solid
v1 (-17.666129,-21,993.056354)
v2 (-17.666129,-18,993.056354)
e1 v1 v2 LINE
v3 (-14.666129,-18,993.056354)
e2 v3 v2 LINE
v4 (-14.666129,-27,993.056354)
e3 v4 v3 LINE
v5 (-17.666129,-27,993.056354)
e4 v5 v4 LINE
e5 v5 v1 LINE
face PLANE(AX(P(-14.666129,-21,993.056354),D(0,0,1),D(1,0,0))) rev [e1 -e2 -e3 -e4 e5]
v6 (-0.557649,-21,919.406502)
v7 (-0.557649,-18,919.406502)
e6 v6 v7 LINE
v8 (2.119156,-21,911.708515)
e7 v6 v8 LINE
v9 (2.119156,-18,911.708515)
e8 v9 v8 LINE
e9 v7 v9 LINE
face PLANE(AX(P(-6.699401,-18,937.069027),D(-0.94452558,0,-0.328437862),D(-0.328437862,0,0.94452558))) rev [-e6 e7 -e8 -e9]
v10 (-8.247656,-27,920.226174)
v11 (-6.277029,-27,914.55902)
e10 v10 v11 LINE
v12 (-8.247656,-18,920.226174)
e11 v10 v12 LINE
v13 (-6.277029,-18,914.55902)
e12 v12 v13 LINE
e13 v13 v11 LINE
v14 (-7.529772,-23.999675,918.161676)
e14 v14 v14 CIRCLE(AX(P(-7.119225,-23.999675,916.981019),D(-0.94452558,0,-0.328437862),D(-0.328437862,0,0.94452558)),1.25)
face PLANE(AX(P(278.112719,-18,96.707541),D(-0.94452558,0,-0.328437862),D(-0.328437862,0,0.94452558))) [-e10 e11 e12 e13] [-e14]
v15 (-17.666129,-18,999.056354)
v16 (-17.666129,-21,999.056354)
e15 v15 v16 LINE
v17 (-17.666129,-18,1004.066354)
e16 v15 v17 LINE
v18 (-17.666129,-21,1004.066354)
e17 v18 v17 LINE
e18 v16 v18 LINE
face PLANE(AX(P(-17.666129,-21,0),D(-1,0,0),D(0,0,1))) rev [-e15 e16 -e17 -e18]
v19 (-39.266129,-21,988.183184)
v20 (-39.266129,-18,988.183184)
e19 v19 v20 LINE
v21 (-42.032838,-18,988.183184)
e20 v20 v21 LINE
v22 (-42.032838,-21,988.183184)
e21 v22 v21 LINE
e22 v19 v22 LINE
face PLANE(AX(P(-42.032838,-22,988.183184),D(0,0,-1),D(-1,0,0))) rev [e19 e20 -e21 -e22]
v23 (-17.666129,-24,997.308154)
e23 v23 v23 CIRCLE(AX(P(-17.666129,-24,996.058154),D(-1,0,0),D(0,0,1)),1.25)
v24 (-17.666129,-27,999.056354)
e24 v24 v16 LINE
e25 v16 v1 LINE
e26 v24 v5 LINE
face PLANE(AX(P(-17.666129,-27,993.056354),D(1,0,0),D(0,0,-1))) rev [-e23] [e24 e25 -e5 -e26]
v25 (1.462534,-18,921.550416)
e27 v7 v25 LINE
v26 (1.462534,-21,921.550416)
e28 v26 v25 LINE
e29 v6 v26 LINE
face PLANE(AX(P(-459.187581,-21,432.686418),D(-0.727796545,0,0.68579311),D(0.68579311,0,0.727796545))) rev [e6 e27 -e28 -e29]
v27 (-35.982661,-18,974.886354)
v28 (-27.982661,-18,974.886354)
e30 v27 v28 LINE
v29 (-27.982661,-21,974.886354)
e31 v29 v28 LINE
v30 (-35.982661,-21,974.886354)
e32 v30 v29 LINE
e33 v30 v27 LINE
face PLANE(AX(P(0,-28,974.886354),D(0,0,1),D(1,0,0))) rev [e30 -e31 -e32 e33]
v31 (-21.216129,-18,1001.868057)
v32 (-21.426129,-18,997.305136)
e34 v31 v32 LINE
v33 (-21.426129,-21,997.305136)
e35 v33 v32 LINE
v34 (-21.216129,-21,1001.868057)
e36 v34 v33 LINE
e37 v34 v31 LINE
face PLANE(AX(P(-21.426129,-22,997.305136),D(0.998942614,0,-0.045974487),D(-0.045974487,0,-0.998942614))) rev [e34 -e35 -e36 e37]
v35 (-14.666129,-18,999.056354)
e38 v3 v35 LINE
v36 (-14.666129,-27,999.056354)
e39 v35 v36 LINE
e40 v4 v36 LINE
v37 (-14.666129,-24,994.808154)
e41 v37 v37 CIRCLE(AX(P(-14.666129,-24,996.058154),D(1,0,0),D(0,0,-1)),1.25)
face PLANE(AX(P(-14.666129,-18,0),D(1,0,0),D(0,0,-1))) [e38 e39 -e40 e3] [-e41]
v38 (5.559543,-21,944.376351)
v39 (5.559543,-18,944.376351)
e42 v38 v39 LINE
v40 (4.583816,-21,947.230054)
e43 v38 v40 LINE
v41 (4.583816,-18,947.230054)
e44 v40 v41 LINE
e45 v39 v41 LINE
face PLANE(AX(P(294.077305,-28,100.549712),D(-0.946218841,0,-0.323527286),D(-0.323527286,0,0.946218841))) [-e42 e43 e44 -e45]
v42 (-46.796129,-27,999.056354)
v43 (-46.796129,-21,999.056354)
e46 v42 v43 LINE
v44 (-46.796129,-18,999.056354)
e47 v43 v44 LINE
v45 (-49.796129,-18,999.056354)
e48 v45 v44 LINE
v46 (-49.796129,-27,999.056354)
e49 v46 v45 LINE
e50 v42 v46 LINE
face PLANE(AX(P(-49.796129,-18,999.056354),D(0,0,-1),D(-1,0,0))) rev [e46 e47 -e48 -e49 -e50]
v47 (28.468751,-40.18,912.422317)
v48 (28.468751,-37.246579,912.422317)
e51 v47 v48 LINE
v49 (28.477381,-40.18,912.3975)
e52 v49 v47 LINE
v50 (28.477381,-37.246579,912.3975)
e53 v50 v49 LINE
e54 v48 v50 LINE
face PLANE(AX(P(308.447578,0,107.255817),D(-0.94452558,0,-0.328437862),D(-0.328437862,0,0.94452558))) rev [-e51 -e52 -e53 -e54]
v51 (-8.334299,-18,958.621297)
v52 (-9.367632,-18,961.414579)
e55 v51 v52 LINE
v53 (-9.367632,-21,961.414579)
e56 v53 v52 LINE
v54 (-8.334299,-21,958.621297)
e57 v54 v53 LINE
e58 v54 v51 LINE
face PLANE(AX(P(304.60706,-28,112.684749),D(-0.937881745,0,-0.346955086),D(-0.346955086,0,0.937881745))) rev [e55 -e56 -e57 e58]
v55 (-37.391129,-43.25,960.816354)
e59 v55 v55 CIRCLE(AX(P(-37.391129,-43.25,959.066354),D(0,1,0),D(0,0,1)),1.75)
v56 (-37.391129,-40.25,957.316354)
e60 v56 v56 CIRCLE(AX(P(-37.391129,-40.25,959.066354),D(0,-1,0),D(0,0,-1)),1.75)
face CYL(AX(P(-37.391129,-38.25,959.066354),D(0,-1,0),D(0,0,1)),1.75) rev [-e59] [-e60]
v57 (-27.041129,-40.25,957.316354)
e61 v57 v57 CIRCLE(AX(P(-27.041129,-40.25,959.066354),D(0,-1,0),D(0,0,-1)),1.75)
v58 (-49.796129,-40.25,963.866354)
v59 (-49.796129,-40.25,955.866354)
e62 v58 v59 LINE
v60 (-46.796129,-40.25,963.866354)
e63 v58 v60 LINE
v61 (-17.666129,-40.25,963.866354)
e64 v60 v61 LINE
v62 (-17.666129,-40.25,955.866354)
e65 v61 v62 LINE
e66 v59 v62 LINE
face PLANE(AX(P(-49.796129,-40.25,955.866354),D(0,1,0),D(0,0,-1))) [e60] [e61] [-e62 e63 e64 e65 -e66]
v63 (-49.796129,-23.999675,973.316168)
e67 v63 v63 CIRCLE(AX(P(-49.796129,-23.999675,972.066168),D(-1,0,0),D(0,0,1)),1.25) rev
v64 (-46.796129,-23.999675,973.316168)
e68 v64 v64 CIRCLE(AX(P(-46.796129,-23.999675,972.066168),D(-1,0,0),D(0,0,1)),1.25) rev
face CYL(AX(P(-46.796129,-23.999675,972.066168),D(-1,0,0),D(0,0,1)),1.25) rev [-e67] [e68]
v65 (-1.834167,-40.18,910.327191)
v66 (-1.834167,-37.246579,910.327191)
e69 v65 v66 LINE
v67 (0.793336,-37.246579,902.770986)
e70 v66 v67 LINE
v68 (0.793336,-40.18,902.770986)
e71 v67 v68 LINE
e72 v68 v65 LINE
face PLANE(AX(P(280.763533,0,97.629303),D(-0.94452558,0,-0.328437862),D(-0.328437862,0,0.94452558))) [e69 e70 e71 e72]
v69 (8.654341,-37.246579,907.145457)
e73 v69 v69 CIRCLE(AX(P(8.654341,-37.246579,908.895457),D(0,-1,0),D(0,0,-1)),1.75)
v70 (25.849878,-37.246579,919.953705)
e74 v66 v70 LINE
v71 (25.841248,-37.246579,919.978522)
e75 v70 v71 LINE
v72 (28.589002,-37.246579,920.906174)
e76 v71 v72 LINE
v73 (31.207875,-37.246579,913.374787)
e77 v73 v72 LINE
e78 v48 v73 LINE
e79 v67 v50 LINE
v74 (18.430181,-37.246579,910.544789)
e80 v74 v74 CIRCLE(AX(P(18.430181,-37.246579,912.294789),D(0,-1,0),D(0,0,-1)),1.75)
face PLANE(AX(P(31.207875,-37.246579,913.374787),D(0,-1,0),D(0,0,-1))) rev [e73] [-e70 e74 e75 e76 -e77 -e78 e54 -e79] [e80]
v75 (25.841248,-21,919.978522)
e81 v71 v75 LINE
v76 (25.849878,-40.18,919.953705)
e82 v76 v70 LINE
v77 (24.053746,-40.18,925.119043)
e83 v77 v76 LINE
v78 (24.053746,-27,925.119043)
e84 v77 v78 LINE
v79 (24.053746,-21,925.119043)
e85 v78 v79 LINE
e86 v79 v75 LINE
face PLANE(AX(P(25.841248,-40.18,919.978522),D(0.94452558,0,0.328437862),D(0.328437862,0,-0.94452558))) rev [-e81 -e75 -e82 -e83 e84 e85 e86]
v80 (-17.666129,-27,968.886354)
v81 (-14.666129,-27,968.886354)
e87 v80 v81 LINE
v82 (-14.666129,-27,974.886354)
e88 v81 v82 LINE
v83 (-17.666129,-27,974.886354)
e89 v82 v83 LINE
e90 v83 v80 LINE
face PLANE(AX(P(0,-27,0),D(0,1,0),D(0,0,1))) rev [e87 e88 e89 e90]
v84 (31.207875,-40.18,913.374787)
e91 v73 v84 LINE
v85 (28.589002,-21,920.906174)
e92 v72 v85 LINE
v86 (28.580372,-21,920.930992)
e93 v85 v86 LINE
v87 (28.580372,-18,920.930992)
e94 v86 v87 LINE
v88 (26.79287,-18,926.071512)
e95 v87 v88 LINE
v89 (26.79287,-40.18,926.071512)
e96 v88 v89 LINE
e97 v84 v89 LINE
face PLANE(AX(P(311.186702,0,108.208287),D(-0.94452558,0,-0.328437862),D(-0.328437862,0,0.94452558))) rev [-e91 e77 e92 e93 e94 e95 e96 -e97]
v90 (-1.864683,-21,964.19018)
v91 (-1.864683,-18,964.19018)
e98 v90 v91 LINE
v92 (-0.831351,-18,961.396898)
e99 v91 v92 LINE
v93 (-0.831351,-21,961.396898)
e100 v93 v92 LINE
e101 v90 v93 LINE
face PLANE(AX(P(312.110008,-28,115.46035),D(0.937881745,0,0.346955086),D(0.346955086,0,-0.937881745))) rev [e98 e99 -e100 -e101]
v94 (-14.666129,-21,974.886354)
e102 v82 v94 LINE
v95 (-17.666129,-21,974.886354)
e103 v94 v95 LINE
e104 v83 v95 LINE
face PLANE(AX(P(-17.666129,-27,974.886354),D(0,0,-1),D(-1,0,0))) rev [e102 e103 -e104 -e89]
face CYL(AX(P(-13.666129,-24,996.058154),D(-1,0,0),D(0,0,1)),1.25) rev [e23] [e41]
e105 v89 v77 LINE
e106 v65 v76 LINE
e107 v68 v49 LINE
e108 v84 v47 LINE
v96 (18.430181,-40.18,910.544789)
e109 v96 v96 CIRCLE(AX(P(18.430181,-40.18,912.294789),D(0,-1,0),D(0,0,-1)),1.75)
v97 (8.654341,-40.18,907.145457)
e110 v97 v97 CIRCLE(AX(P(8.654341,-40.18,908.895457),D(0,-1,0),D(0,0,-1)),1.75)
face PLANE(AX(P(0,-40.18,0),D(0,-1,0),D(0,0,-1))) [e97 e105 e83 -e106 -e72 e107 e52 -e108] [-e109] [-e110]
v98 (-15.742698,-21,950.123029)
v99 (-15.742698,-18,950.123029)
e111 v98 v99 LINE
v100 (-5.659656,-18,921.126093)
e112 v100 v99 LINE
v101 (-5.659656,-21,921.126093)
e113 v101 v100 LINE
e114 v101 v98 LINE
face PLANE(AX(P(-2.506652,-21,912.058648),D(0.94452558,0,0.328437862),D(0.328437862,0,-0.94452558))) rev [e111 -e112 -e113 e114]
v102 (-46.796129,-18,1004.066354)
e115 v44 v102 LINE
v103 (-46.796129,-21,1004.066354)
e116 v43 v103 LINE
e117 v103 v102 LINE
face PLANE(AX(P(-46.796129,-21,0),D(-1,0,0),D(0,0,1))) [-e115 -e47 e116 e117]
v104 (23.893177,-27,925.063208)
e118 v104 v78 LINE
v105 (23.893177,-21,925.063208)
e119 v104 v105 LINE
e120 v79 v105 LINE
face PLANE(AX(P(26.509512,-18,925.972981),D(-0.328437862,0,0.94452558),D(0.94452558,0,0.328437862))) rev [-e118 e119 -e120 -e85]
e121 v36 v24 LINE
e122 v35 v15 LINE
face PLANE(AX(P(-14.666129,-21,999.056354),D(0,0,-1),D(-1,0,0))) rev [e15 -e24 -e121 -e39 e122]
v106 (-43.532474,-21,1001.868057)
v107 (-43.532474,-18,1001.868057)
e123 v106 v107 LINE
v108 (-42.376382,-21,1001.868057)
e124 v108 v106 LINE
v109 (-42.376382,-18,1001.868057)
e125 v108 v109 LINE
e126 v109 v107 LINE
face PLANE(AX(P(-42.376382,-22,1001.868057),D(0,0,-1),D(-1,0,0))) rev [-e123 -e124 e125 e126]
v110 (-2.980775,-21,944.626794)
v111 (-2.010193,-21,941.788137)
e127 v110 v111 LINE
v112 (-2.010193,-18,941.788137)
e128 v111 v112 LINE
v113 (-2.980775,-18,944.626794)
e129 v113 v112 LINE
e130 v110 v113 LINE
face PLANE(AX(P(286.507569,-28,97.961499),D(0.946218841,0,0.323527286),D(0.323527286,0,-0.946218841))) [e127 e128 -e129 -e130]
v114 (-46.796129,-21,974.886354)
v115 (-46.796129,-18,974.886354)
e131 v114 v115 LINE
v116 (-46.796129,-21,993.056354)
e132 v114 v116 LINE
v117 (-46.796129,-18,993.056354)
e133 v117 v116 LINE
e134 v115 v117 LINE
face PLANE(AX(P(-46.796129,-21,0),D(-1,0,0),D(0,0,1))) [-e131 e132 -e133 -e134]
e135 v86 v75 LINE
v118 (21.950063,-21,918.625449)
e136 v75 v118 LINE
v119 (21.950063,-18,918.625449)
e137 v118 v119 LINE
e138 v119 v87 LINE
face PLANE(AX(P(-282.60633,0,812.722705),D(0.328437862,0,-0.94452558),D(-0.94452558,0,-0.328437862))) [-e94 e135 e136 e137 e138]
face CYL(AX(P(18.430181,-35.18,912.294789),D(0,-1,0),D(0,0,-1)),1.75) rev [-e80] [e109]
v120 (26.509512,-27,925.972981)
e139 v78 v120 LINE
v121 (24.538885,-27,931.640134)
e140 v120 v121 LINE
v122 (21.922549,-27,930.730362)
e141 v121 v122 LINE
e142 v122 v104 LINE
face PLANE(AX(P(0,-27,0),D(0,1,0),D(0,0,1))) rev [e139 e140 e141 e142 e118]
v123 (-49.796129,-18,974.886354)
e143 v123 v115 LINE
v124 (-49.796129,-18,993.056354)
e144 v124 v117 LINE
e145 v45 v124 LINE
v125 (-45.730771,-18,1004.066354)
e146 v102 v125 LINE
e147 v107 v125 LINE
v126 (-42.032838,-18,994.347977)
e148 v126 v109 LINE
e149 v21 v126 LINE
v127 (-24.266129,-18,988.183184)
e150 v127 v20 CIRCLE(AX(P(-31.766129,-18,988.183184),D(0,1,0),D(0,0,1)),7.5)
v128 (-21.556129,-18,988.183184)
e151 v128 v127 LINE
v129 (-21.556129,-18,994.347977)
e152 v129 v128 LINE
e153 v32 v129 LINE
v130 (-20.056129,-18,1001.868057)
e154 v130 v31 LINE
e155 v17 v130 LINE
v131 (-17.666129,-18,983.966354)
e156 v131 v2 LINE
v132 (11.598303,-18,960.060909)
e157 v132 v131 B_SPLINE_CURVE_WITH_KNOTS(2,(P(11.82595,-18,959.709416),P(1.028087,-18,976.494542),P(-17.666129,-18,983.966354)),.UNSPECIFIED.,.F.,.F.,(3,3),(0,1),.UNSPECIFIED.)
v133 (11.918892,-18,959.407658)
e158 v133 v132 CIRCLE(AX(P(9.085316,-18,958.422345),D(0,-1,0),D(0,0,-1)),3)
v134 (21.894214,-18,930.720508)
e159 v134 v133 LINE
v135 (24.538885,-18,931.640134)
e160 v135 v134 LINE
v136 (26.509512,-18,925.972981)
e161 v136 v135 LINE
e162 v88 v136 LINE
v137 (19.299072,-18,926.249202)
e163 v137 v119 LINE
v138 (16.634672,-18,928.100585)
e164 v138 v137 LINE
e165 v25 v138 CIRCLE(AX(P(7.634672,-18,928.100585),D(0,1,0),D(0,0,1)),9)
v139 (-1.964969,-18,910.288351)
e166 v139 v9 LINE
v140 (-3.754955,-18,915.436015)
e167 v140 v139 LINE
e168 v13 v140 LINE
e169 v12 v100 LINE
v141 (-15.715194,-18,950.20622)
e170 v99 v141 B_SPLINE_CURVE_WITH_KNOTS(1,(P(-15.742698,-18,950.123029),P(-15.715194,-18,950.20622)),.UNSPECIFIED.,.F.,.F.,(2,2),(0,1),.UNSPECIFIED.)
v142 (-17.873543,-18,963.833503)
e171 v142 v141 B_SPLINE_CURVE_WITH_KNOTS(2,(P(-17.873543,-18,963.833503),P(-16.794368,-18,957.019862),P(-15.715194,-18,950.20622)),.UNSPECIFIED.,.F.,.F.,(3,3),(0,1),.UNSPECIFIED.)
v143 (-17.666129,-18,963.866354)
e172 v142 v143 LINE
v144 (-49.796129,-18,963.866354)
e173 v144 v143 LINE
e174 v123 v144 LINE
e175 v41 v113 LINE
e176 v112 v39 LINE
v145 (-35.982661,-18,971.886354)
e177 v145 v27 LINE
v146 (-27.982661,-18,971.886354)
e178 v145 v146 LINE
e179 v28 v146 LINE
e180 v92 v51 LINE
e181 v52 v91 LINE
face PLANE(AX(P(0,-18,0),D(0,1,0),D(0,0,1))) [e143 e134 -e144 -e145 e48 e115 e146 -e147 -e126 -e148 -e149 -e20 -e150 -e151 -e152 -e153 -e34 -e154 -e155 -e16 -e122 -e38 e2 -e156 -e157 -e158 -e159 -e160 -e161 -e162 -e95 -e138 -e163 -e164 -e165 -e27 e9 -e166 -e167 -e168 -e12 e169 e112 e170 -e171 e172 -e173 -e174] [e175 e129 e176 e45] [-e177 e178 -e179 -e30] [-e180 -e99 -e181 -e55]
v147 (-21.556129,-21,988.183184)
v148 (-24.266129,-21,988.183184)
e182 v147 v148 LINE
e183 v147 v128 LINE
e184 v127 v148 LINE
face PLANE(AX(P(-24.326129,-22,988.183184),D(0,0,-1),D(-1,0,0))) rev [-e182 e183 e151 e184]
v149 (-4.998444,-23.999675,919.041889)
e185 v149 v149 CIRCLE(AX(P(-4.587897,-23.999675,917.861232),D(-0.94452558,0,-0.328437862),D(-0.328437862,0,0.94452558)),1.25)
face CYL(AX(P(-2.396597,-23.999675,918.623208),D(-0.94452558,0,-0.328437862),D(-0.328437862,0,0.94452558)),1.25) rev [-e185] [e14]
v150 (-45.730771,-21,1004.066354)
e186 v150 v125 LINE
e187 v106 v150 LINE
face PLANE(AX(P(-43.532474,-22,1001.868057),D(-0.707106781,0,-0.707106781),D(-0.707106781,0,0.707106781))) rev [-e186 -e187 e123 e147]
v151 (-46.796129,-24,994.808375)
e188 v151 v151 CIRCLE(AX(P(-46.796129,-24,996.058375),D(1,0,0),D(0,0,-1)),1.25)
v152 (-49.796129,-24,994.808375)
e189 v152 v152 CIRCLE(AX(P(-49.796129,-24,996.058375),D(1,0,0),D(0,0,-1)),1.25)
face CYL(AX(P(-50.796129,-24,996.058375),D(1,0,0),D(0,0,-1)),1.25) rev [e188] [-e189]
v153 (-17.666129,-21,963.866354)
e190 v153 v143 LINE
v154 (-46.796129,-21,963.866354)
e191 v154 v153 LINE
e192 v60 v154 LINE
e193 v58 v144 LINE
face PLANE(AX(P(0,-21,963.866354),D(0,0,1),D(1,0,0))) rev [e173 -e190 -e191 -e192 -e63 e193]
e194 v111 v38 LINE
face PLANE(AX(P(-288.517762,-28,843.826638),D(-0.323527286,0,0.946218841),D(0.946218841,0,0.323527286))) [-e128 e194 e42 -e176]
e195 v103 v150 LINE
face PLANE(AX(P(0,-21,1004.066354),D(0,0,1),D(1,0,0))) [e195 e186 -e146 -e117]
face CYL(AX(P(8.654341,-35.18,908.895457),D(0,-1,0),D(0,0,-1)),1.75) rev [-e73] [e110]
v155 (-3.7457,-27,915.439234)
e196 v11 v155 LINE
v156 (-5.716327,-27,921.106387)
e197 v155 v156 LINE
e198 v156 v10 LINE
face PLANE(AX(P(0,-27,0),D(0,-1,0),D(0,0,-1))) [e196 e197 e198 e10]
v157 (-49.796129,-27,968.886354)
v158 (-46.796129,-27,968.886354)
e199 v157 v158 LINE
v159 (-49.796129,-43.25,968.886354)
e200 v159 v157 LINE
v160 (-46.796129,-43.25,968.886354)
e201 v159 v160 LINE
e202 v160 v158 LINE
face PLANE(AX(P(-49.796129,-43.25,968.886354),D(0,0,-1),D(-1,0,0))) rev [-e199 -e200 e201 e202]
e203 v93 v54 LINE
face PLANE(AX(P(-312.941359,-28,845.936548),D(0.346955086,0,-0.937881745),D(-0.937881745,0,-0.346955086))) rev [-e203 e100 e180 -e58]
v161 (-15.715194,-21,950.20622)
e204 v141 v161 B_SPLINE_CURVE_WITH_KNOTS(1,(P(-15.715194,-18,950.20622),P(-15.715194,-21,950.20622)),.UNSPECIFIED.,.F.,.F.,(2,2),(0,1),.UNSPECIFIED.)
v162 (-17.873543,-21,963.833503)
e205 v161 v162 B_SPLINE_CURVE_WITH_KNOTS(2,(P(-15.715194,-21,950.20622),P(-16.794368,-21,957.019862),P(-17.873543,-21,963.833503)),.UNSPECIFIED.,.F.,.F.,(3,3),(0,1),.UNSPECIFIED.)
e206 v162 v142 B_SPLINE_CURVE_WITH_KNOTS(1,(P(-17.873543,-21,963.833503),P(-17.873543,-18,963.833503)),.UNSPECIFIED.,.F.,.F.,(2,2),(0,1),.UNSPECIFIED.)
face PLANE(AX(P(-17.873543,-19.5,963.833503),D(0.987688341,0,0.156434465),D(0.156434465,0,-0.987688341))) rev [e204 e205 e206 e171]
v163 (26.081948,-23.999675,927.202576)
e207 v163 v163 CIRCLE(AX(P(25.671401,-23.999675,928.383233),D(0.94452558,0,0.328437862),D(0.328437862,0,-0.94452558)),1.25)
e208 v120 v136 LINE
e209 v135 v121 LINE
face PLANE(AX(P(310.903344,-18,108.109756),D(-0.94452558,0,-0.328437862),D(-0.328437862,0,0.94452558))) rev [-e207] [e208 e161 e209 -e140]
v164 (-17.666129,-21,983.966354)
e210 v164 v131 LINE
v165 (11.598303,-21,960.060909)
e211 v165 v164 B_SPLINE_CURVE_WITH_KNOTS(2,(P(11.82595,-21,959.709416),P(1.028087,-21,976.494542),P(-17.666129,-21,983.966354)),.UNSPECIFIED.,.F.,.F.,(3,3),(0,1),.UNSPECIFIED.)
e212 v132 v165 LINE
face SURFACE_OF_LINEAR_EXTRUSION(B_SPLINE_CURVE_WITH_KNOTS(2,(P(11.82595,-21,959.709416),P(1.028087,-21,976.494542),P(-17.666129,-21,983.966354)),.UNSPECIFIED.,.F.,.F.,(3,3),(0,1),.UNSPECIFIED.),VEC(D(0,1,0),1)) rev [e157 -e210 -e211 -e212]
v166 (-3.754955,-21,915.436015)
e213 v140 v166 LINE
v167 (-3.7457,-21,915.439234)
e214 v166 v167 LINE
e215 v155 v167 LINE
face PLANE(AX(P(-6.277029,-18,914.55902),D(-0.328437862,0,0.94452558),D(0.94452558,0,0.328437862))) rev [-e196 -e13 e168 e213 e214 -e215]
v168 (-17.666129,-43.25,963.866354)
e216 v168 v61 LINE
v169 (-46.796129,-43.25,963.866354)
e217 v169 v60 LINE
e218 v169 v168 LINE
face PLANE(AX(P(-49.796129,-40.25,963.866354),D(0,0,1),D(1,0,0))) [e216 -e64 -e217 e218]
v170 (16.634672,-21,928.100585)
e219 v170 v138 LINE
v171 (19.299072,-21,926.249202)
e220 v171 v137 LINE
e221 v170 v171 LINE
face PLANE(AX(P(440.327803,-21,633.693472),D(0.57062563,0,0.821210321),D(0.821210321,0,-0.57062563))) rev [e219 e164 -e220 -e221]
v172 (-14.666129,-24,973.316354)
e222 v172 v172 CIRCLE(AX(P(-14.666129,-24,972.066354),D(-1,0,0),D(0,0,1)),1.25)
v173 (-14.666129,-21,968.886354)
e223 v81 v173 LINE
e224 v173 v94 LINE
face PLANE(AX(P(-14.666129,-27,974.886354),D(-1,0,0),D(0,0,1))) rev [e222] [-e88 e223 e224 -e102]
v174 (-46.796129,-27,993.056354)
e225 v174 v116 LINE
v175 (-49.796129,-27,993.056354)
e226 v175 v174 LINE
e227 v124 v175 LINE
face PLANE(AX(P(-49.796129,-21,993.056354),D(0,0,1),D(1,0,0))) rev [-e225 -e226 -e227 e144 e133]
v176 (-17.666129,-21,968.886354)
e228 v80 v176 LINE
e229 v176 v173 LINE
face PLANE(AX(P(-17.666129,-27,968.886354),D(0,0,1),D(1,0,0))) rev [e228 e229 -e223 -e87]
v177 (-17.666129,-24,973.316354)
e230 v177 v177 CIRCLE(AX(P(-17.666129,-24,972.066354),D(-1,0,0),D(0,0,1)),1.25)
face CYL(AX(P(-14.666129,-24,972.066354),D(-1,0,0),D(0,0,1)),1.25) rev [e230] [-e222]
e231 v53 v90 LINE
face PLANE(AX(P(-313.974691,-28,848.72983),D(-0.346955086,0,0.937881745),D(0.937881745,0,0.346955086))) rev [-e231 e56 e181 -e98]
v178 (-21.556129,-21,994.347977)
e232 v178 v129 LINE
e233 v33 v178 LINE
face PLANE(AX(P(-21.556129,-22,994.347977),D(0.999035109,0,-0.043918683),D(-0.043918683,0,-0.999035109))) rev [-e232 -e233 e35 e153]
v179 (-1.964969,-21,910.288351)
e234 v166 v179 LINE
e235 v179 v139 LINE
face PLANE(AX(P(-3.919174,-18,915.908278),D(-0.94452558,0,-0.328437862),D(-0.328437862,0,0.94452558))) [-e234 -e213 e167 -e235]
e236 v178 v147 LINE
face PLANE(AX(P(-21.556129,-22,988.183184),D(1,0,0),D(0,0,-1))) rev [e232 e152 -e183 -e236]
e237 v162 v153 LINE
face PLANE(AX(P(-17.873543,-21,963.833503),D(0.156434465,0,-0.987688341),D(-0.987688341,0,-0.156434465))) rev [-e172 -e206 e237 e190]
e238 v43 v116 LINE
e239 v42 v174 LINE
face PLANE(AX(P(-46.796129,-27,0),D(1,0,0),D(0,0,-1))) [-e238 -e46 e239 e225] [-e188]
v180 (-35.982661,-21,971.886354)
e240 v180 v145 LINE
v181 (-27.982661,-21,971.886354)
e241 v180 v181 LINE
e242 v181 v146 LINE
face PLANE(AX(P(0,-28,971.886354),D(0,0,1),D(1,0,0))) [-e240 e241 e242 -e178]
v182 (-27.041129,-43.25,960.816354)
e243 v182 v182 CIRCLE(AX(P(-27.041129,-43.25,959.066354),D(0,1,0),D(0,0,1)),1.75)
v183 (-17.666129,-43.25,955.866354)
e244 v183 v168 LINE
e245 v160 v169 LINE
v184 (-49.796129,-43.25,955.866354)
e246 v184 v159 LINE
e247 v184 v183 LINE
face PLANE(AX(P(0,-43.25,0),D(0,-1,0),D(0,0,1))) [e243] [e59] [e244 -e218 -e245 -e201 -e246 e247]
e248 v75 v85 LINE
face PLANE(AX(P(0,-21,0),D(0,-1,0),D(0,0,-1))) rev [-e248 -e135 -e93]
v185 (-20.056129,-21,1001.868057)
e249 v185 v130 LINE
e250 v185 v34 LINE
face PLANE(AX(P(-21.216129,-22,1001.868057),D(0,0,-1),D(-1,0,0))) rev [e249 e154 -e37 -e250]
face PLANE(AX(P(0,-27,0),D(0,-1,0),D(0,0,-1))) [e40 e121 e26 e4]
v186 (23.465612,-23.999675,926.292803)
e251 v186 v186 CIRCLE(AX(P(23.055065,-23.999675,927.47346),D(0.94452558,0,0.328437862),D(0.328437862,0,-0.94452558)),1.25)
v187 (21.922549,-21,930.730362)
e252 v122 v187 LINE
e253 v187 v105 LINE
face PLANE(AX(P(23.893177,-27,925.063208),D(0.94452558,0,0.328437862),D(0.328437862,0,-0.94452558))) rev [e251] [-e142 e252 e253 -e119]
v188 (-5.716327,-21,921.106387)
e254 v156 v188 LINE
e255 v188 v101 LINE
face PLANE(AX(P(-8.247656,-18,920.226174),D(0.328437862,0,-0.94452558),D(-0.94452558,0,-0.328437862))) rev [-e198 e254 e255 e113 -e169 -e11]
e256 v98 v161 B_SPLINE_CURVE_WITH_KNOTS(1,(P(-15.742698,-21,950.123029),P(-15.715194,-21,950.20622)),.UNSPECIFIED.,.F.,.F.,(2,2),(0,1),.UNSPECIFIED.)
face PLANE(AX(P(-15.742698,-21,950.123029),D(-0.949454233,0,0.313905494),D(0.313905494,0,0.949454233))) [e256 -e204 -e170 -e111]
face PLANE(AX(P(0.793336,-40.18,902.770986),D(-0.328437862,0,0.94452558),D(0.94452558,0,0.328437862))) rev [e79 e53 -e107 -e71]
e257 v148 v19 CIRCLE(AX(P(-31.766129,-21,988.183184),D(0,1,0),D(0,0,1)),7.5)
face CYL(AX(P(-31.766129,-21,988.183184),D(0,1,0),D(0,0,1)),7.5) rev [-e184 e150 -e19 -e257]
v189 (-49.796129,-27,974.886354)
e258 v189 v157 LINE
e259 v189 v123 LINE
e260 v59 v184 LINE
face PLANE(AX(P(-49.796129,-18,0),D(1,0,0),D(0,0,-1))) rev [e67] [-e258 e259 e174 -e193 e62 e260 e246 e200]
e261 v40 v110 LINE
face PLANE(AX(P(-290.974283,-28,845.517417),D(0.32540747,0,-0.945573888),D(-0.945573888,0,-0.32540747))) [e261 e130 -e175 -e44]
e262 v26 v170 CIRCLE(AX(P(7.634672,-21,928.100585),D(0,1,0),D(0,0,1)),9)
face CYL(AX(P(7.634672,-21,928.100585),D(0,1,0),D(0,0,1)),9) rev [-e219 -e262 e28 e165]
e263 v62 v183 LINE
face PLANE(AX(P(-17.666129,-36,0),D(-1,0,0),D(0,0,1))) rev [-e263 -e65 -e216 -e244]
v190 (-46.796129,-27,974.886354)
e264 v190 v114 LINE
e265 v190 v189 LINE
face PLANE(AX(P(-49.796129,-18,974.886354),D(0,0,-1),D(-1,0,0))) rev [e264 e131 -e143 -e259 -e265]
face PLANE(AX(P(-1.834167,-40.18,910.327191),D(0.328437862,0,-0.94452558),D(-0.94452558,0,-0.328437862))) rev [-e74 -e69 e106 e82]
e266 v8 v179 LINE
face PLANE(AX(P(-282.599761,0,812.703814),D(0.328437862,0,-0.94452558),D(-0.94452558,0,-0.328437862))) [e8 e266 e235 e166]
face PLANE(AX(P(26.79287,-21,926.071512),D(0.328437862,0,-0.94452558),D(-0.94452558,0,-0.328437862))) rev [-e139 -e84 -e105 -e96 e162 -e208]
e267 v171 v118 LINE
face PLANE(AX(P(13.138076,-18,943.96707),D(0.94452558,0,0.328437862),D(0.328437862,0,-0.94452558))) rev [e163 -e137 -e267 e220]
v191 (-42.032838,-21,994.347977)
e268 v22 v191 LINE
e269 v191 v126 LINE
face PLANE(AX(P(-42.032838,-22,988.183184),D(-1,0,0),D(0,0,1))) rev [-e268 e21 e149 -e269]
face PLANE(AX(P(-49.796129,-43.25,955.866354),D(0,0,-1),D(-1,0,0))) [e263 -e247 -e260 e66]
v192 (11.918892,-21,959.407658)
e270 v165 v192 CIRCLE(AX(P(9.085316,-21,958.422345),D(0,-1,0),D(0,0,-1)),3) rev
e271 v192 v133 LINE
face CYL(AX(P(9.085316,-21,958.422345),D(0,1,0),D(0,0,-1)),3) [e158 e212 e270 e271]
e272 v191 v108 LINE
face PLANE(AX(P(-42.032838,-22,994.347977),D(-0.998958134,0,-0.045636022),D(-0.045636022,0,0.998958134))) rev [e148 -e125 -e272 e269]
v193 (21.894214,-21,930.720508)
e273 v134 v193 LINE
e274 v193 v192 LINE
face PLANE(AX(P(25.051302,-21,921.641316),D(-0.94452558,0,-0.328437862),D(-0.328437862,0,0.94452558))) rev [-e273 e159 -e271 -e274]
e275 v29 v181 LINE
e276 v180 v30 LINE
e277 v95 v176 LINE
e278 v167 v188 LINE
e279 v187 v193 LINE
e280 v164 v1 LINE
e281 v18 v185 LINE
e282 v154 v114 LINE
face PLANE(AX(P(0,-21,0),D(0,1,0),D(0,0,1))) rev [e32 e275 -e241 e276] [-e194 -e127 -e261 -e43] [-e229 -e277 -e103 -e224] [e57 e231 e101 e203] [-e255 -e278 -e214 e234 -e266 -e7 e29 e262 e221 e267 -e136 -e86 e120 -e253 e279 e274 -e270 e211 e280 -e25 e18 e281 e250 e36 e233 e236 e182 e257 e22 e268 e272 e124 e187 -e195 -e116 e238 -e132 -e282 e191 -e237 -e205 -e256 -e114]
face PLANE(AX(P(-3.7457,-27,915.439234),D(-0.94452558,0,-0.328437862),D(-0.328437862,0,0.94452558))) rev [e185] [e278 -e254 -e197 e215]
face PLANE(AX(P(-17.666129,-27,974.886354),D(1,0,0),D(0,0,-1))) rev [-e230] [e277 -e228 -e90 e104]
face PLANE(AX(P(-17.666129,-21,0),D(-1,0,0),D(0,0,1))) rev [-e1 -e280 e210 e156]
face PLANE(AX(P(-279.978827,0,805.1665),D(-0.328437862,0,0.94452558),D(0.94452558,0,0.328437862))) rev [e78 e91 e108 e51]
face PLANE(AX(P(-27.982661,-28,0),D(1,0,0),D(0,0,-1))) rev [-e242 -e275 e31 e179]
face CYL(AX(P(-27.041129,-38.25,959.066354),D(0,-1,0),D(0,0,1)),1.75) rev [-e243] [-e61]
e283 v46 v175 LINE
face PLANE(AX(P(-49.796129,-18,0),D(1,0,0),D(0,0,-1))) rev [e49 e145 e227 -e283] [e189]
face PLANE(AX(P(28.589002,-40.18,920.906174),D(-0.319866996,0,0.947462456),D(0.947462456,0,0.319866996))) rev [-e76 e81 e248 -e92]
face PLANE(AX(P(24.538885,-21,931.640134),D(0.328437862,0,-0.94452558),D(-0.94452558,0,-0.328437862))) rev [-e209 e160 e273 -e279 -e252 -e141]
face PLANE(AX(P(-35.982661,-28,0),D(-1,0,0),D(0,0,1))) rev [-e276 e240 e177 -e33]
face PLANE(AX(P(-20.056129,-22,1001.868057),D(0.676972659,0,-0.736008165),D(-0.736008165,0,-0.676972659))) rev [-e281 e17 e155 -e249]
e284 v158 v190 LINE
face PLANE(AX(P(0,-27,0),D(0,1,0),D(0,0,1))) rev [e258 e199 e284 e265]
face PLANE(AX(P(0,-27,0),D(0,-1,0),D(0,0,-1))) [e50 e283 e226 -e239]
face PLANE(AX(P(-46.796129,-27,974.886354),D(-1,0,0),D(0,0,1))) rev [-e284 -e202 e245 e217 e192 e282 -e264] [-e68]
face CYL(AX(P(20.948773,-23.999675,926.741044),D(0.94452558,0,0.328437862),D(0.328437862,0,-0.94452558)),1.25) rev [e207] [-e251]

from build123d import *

# Parameters (mm, degrees)
SKETCH1_W                 = 29.13
SKETCH1_H                 = 40.2
BOSS_EXTRUDE1_DEPTH       = 3
SKETCH3_W                 = 6
SKETCH3_H                 = 3
BOSS_EXTRUDE2_DEPTH       = 3
SKETCH4_W                 = 3
SKETCH4_H                 = 6
BOSS_EXTRUDE3_DEPTH       = 6
SKETCH6_W                 = 6
SKETCH6_H                 = 3
BOSS_EXTRUDE4_DEPTH       = 2
SKETCH7_W                 = 3.000000005
SKETCH7_H                 = 6
BOSS_EXTRUDE6_DEPTH       = 6
SKETCH9_R                 = 1.25
CUT_EXTRUDE1_DEPTH        = 3
SKETCH8_R                 = 1.250000001
CUT_EXTRUDE2_DEPTH        = 3
SKETCH11_W                = 6
SKETCH11_H                = 3
BOSS_EXTRUDE7_DEPTH       = 3
SKETCH19_W                = 3
SKETCH19_H                = 6
BOSS_EXTRUDE11_DEPTH      = 6
SKETCH21_W                = 6
SKETCH21_H                = 3
BOSS_EXTRUDE12_DEPTH      = 3
SKETCH22_W                = 3
SKETCH22_H                = 6
BOSS_EXTRUDE13_DEPTH      = 6
SKETCH24_R                = 1.25
CUT_EXTRUDE5_DEPTH        = 4
SKETCH23_R                = 1.25
CUT_EXTRUDE6_DEPTH        = 4
CUT_EXTRUDE11_DEPTH       = 4
SKETCH30_W                = 25.92
SKETCH30_H                = 3
CUT_EXTRUDE12_DEPTH       = 15
SKETCH33_W                = 29.17650364
SKETCH33_H                = 3
BOSS_EXTRUDE14_DEPTH      = 40.3
SKETCH34_W                = 21.00258235
SKETCH34_H                = 3
CUT_EXTRUDE15_DEPTH       = 25
SKETCH37_W                = 4.5
SKETCH37_H                = 3
SKETCH37_W_2              = 1.5
BOSS_EXTRUDE15_DEPTH      = 3
BOSS_EXTRUDE16_DEPTH      = 6
SKETCH41_W                = 6
SKETCH41_H                = 3
BOSS_EXTRUDE17_DEPTH      = 2.8
BOSS_EXTRUDE18_DEPTH      = 6
SKETCH46_W                = 5.02
SKETCH46_H                = 3
BOSS_EXTRUDE19_DEPTH      = 3
SKETCH48_W                = 3
SKETCH48_H                = 5.02
BOSS_EXTRUDE20_DEPTH      = 22.25
BOSS_EXTRUDE22_DEPTH      = 29.13
BOSS_EXTRUDE22_DEPTH_BACK = 3
SKETCH50_W                = 8
SKETCH50_H                = 3
SKETCH51_R                = 1.75
CUT_EXTRUDE21_DEPTH       = 5
SKETCH56_W                = 3.994197227
SKETCH56_H                = 3.994197227
CUT_EXTRUDE26_DEPTH       = 0.1
FILLET4_START             = -19
FILLET4_DEPTH             = 5
BOSS_EXTRUDE28_DEPTH      = 0.21
BOSS_EXTRUDE29_DEPTH      = 3
BOSS_EXTRUDE30_DEPTH      = 1.95
BOSS_EXTRUDE30_DEPTH_BACK = 4
SKETCH68_W                = 4.32399603
SKETCH68_H                = 3
SKETCH69_W                = 3.919724064
SKETCH69_H                = 3
BOSS_EXTRUDE31_DEPTH      = 1.83
SKETCH70_W                = 5.44243662
SKETCH70_H                = 3
BOSS_EXTRUDE32_DEPTH      = 3.1
BOSS_EXTRUDE33_DEPTH      = 19.18
SKETCH72_W                = 2.9
SKETCH72_H                = 2.93342148
BOSS_EXTRUDE34_DEPTH      = 8
SKETCH73_W                = 8
SKETCH73_H                = 2.93342148
BOSS_EXTRUDE35_DEPTH      = 29.31
SKETCH74_R                = 1.749999995
CUT_EXTRUDE27_DEPTH       = 5
SKETCH75_R                = 1.25
CUT_EXTRUDE28_DEPTH       = 5
SKETCH76_R                = 1.25
CUT_EXTRUDE29_DEPTH       = 5
BOSS_EXTRUDE37_DEPTH      = 3
BOSS_EXTRUDE40_DEPTH      = 3
SKETCH79_W                = 4
SKETCH79_H                = 3
CUT_EXTRUDE30_DEPTH       = 10
CUT_EXTRUDE31_DEPTH       = 10
CUT_EXTRUDE32_DEPTH       = 10


with BuildPart() as part:
    # Sketch1 → Boss-Extrude1 (new body)
    with BuildSketch(Plane(origin=(0, 0, 0), x_dir=(1, 0, 0), z_dir=(0, 1, 0))):
        with Locations((-32.231128585, -983.966354464)):
            Rectangle(SKETCH1_W, SKETCH1_H)
        with BuildLine():
            Line((-15.507778999, -950.239071497), (-17.666128585, -963.866354464))
            Line((-17.666128585, -963.866354464), (-17.666128585, -983.966354464))
            add(Edge.make_bspline(
                [(11.825950039, -959.709415703), (1.028086592, -976.494542347), (-17.666128585, -983.966354464)],
                knots=[0, 0, 0, 1, 1, 1], degree=2))
            Line((11.825950039, -959.709415703), (-15.497121464, -950.208422428))
            Line((-15.497121464, -950.208422428), (-15.507778999, -950.239071497))
        make_face()
    extrude(amount=-BOSS_EXTRUDE1_DEPTH)

    # Sketch3 → Boss-Extrude2 (add)
    with BuildSketch(Plane.ZY.offset(46.796128585)):
        with Locations((971.886354464, -1.5)):
            Rectangle(SKETCH3_W, SKETCH3_H)
    extrude(amount=BOSS_EXTRUDE2_DEPTH)

    # Sketch4 → Boss-Extrude3 (add)
    with BuildSketch(Plane.XZ.offset(3)):
        with Locations((-48.296128585, 971.886354464)):
            Rectangle(SKETCH4_W, SKETCH4_H)
    extrude(amount=BOSS_EXTRUDE3_DEPTH)

    # Sketch6 → Boss-Extrude4 (add)
    with BuildSketch(Plane(origin=(-17.666128585, 0, 0), x_dir=(0, 0, -1), z_dir=(1, 0, 0))):
        with Locations((-971.886354464, -1.5)):
            Rectangle(SKETCH6_W, SKETCH6_H)
    extrude(amount=BOSS_EXTRUDE4_DEPTH)

    # Sketch7 → Boss-Extrude6 (add)
    with BuildSketch(Plane.XZ.offset(3)):
        with Locations((-16.166128583, 971.886354464)):
            Rectangle(SKETCH7_W, SKETCH7_H)
    extrude(amount=BOSS_EXTRUDE6_DEPTH)

    # Sketch9 → Cut-Extrude1 (cut)
    with BuildSketch(Plane.ZY.offset(17.666128585)):
        with Locations((972.066354464, -6)):
            Circle(SKETCH9_R)
    extrude(amount=-CUT_EXTRUDE1_DEPTH, mode=Mode.SUBTRACT)

    # Sketch8 → Cut-Extrude2 (cut)
    with BuildSketch(Plane(origin=(-49.796128585, 0, 0), x_dir=(0, 0, -1), z_dir=(1, 0, 0))):
        with Locations(Location((-972.066168305, -5.999675203, 0), (0, 0, 180))):
            Circle(SKETCH8_R)
    extrude(amount=CUT_EXTRUDE2_DEPTH, mode=Mode.SUBTRACT)

    # Sketch11 → Boss-Extrude7 (add)
    with BuildSketch(Plane.ZY.offset(46.796128585)):
        with Locations((996.056354464, -1.5)):
            Rectangle(SKETCH11_W, SKETCH11_H)
    extrude(amount=BOSS_EXTRUDE7_DEPTH)

    # Sketch19 → Boss-Extrude11 (add)
    with BuildSketch(Plane.XZ.offset(3)):
        with Locations((-48.296128585, 996.056354464)):
            Rectangle(SKETCH19_W, SKETCH19_H)
    extrude(amount=BOSS_EXTRUDE11_DEPTH)

    # Sketch21 → Boss-Extrude12 (add)
    with BuildSketch(Plane(origin=(-17.666128585, 0, 0), x_dir=(0, 0, -1), z_dir=(1, 0, 0))):
        with Locations((-996.056354464, -1.5)):
            Rectangle(SKETCH21_W, SKETCH21_H)
    extrude(amount=BOSS_EXTRUDE12_DEPTH)

    # Sketch22 → Boss-Extrude13 (add)
    with BuildSketch(Plane.XZ.offset(3)):
        with Locations((-16.166128585, 996.056354464)):
            Rectangle(SKETCH22_W, SKETCH22_H)
    extrude(amount=BOSS_EXTRUDE13_DEPTH)

    # Sketch24 → Cut-Extrude5 (cut)
    with BuildSketch(Plane(origin=(-46.796128585, 0, 0), x_dir=(0, 0, -1), z_dir=(1, 0, 0))):
        with Locations((-996.058375158, -6)):
            Circle(SKETCH24_R)
    extrude(amount=-CUT_EXTRUDE5_DEPTH, mode=Mode.SUBTRACT)

    # Sketch23 → Cut-Extrude6 (cut)
    with BuildSketch(Plane.ZY.offset(17.666128585)):
        with Locations((996.058154464, -6)):
            Circle(SKETCH23_R)
    extrude(amount=-CUT_EXTRUDE6_DEPTH, mode=Mode.SUBTRACT)

    # Sketch29 → Cut-Extrude11 (cut)
    with BuildSketch(Plane(origin=(0, 0, 0), x_dir=(1, 0, 0), z_dir=(0, 1, 0))):
        Polygon((-24.326128585, -988.183184315), (-24.326128585, -1004.066354464), (-17.666128585, -1004.066354464), (-20.056128585, -1001.868057312), (-21.216128585, -1001.868057312), (-21.426128585, -997.305136389), (-21.556128585, -994.347976596), (-21.556128585, -988.183184315), align=None)
        Polygon((-42.032837695, -988.183184315), (-39.266128585, -988.183184315), (-39.266128585, -1004.066354464), (-45.730771266, -1004.066354464), (-43.532474114, -1001.868057312), (-42.376382193, -1001.868057312), (-42.032837695, -994.347976596), align=None)
    extrude(amount=-CUT_EXTRUDE11_DEPTH, mode=Mode.SUBTRACT)

    # Sketch30 → Cut-Extrude12 (cut)
    with BuildSketch(Plane.ZY.offset(39.266128585)):
        with Locations((991.106354464, -1.5)):
            Rectangle(SKETCH30_W, SKETCH30_H)
    extrude(amount=-CUT_EXTRUDE12_DEPTH, mode=Mode.SUBTRACT)

    # Sketch33 → Boss-Extrude14 (add)
    with BuildSketch(Plane(origin=(-296.443416752, 0, 852.515567448), x_dir=(-0.9445255798324886, 0, -0.32843786176703366), z_dir=(0.3284378617670337, 0, -0.9445255798324887))):
        with Locations((-311.77524668, -1.5)):
            Rectangle(SKETCH33_W, SKETCH33_H)
    extrude(amount=BOSS_EXTRUDE14_DEPTH)

    # Sketch34 → Cut-Extrude15 (cut)
    with BuildSketch(Plane(origin=(-283.207370923, 0, 814.451186581), x_dir=(-0.9445255798324887, 0, -0.32843786176703327), z_dir=(0.32843786176703327, 0, -0.9445255798324887))):
        with Locations((-311.942483261, -1.5)):
            Rectangle(SKETCH34_W, SKETCH34_H)
    extrude(amount=-CUT_EXTRUDE15_DEPTH, mode=Mode.SUBTRACT)

    # Sketch37 → Boss-Extrude15 (add)
    with BuildSketch(Plane(origin=(280.946295288, 0, 97.69285498), x_dir=(-0.32843786176743117, 0, 0.9445255798323505), z_dir=(-0.9445255798323505, 0, -0.32843786176743117))):
        with Locations((868.136002588, -1.5)):
            Rectangle(SKETCH37_W, SKETCH37_H)
        with Locations((871.136002588, -1.5)):
            Rectangle(SKETCH37_W_2, SKETCH37_H)
    extrude(amount=BOSS_EXTRUDE15_DEPTH)

    # Sketch39 → Boss-Extrude16 (add)
    with BuildSketch(Plane.XZ.offset(3)):
        Polygon((-6.277028676, 914.559020058), (-3.745700122, 915.439233528), (-5.716327292, 921.106387007), (-8.247655846, 920.226173537), align=None)
    extrude(amount=BOSS_EXTRUDE16_DEPTH)

    # Sketch41 → Boss-Extrude17 (add)
    with BuildSketch(Plane(origin=(308.258672657, 0, 107.190129606), x_dir=(0.3284378617670337, 0, -0.9445255798324887), z_dir=(0.9445255798324887, 0, 0.3284378617670337))):
        with Locations((-868.898439213, -1.5)):
            Rectangle(SKETCH41_W, SKETCH41_H)
    extrude(amount=BOSS_EXTRUDE17_DEPTH)

    # Sketch42 → Boss-Extrude18 (add)
    with BuildSketch(Plane.XZ.offset(3)):
        Polygon((23.893176542, 925.063208116), (21.922549371, 930.730361595), (24.538885227, 931.640134472), (26.509512398, 925.972980993), align=None)
    extrude(amount=BOSS_EXTRUDE18_DEPTH)


with BuildPart() as body_2:
    # Mirror1: mirrored copy
    add(part.part.mirror(Plane(origin=(0, -9, 0), x_dir=(0, 0, 1), z_dir=(0, -1, 0))))

    # Sketch46 → Boss-Extrude19 (add)
    with BuildSketch(Plane.ZY.offset(46.796128585)):
        with Locations((966.376354464, -16.5)):
            Rectangle(SKETCH46_W, SKETCH46_H)
    extrude(amount=BOSS_EXTRUDE19_DEPTH)

    # Sketch48 → Boss-Extrude20 (add)
    with BuildSketch(Plane(origin=(0, -15, 0), x_dir=(1, 0, 0), z_dir=(0, 1, 0))):
        with Locations((-48.296128585, -966.376354464)):
            Rectangle(SKETCH48_W, SKETCH48_H)
    extrude(amount=BOSS_EXTRUDE20_DEPTH)

    # Sketch50 → Boss-Extrude22 (add, two sides: drawn at the far end of the back side and taken through both)
    with BuildSketch(Plane(origin=(-46.796128585, 0, 0), x_dir=(0, 0, -1), z_dir=(1, 0, 0)).offset(-BOSS_EXTRUDE22_DEPTH_BACK)):
        with Locations((-959.866354464, 5.75)):
            Rectangle(SKETCH50_W, SKETCH50_H)
    extrude(amount=BOSS_EXTRUDE22_DEPTH + BOSS_EXTRUDE22_DEPTH_BACK)

    # Sketch51 → Cut-Extrude21 (cut)
    with BuildSketch(Plane(origin=(0, 7.25, 0), x_dir=(1, 0, 0), z_dir=(0, 1, 0))):
        with Locations(Location((-37.391128585, -959.066354477, 0), (0, 0, 270))):
            Circle(SKETCH51_R)
        with Locations(Location((-27.041128585, -959.066354477, 0), (0, 0, 270))):
            Circle(SKETCH51_R)
    extrude(amount=-CUT_EXTRUDE21_DEPTH, mode=Mode.SUBTRACT)

    # Sketch56 → Cut-Extrude26 (cut)
    with BuildSketch(Plane(origin=(-283.207370923, 0, 814.451186581), x_dir=(-0.9445255798324892, 0, -0.32843786176703227), z_dir=(0.32843786176703227, 0, -0.9445255798324892))):
        with Locations((-299.444093473, -16.997098614)):
            Rectangle(SKETCH56_W, SKETCH56_H)
    extrude(amount=-CUT_EXTRUDE26_DEPTH, mode=Mode.SUBTRACT)

    # Fillet4: read off the stored shape, not the designer's step
    # Fillet4 outline → Fillet4 (cut)
    with BuildSketch(Plane(origin=(0, 0, 0), x_dir=(1, 0, 0), z_dir=(0, 1, 0)).offset(FILLET4_START)):
        with BuildLine():
            Line((11.815255904, -959.705697054), (11.918892326, -959.407658179))
            ThreePointArc((11.918892326, -959.407658179), (11.77847749, -959.744040081), (11.598302874, -960.060909482))
            add(Edge.make_bspline(
                [(11.825950039, -959.709415703), (11.712561825, -959.885676085), (11.598302874, -960.060909482)],
                knots=[0, 0, 0, 0.010500986, 0.010500986, 0.010500986], degree=2))
            Line((11.825950039, -959.709415703), (11.815255904, -959.705697054))
        make_face()
    extrude(amount=FILLET4_DEPTH, mode=Mode.SUBTRACT)


with BuildPart() as body_2_2:
    # Mirror2: mirrored copy
    add(body_2.part.mirror(Plane(origin=(-13.409558554, -18, 961.997167091), x_dir=(0, 0, 1), z_dir=(0, -1, 0))))

    # Sketch63 → Boss-Extrude28 (add)
    with BuildSketch(Plane(origin=(131.691734271, 0, 20.857921628), x_dir=(-0.15643446504022615, 0, 0.9876883405951385), z_dir=(-0.9876883405951385, 0, -0.15643446504022615))):
        with BuildLine():
            add(Edge.make_bspline(
                [(954.763151571, -21), (947.864577189, -21), (940.966002807, -21)],
                knots=[0, 0, 0, 1, 1, 1], degree=2))
            Line((940.966002807, -21), (940.966002807, -18))
            add(Edge.make_bspline(
                [(954.763151571, -18), (947.864577189, -18), (940.966002807, -18)],
                knots=[0, 0, 0, 1, 1, 1], degree=2))
            Line((954.763151571, -18), (954.763151571, -21))
        make_face()
    extrude(amount=BOSS_EXTRUDE28_DEPTH)

    # Sketch67 → Boss-Extrude29 (add)
    with BuildSketch(Plane(origin=(0, -18, 0), x_dir=(1, 0, 0), z_dir=(0, 1, 0))):
        Polygon((-15.715193551, -950.206220259), (-15.742698114, -950.123028585), (-15.497121464, -950.208422428), (-15.507778999, -950.239071497), align=None)
    extrude(amount=-BOSS_EXTRUDE29_DEPTH)

    # Sketch68 → Boss-Extrude30 (add, two sides: drawn at the far end of the back side and taken through both)
    with BuildSketch(Plane(origin=(-283.240214709, 0, 814.545639139), x_dir=(-0.9445255798324883, -3.1744861168227707e-15, -0.32843786176703493), z_dir=(0.32843786176703493, -9.129225613729643e-15, -0.9445255798324883)).offset(-BOSS_EXTRUDE30_DEPTH_BACK)):
        with Locations((-299.279194071, -19.5)):
            Rectangle(SKETCH68_W, SKETCH68_H)
    extrude(amount=BOSS_EXTRUDE30_DEPTH + BOSS_EXTRUDE30_DEPTH_BACK)

    # Sketch69 → Boss-Extrude31 (add)
    with BuildSketch(Plane(origin=(-283.207370923, 0, 814.451186581), x_dir=(-0.9445255798324895, 0, -0.32843786176703144), z_dir=(0.32843786176703144, 0, -0.9445255798324895))):
        with Locations((-324.403636468, -19.5)):
            Rectangle(SKETCH69_W, SKETCH69_H)
    extrude(amount=BOSS_EXTRUDE31_DEPTH)

    # Sketch70 → Boss-Extrude32 (add)
    with BuildSketch(Plane(origin=(308.258672657, 0, 107.190129606), x_dir=(0.3284378617670337, 0, -0.9445255798324887), z_dir=(0.9445255798324887, 0, 0.3284378617670337))):
        with Locations((-863.177220903, -19.5)):
            Rectangle(SKETCH70_W, SKETCH70_H)
    extrude(amount=BOSS_EXTRUDE32_DEPTH)

    # Sketch71 → Boss-Extrude33 (add)
    with BuildSketch(Plane.XZ.offset(21)):
        Polygon((28.589002033, 920.906174309), (26.792870072, 926.071512351), (24.05374589, 925.119042552), (25.841248137, 919.978521948), align=None)
    extrude(amount=BOSS_EXTRUDE33_DEPTH)

    # Sketch72 → Boss-Extrude34 (add)
    with BuildSketch(Plane(origin=(-282.606329636, 0, 812.722704769), x_dir=(-0.9445255798324861, 0, -0.3284378617670412), z_dir=(0.3284378617670412, 0, -0.9445255798324861))):
        with Locations((-328.0134985, -38.71328926)):
            Rectangle(SKETCH72_W, SKETCH72_H)
    extrude(amount=BOSS_EXTRUDE34_DEPTH)

    # Sketch73 → Boss-Extrude35 (add)
    with BuildSketch(Plane(origin=(308.447577773, 0, 107.255817179), x_dir=(-0.32843786176702733, 0, 0.9445255798324909), z_dir=(-0.944525579832491, 0, -0.32843786176702733))):
        with Locations((856.429727564, -38.71328926)):
            Rectangle(SKETCH73_W, SKETCH73_H)
    extrude(amount=BOSS_EXTRUDE35_DEPTH)

    # Sketch74 → Cut-Extrude27 (cut)
    with BuildSketch(Plane.XZ.offset(40.18)):
        with Locations(Location((18.430180878, 912.294788657, 0), (0, 0, 270))):
            Circle(SKETCH74_R)
        with Locations(Location((8.654341123, 908.895456798, 0), (0, 0, 270))):
            Circle(SKETCH74_R)
    extrude(amount=-CUT_EXTRUDE27_DEPTH, mode=Mode.SUBTRACT)


with BuildPart() as body_2_3:
    # Mirror3: mirrored copy
    add(body_2_2.part.mirror(Plane(origin=(-34.71389823, -43.25, 960.314964032), x_dir=(0, 0, 1), z_dir=(0, -1, 0))))


with BuildPart() as body_2_4:
    # Mirror4: mirrored copy
    add(body_2_3.part.mirror(Plane(origin=(-34.71389823, -43.25, 960.314964032), x_dir=(0, 0, 1), z_dir=(0, 1, 0))))

    # Sketch75 → Cut-Extrude28 (cut)
    with BuildSketch(Plane(origin=(278.112718549, 0, 96.707541395), x_dir=(-0.32843786176743106, 0, 0.9445255798323505), z_dir=(-0.9445255798323505, 0, -0.32843786176743106))):
        with Locations((868.450251665, -23.999675203)):
            Circle(SKETCH75_R)
    extrude(amount=-CUT_EXTRUDE28_DEPTH, mode=Mode.SUBTRACT)

    # Sketch76 → Cut-Extrude29 (cut)
    with BuildSketch(Plane(origin=(310.90334428, 0, 108.109755619), x_dir=(0.32843786176703343, 0, -0.9445255798324887), z_dir=(0.9445255798324889, 0, 0.3284378617670335))):
        with Locations(Location((-868.450251635, -23.999675203, 0), (0, 0, 180))):
            Circle(SKETCH76_R)
    extrude(amount=-CUT_EXTRUDE29_DEPTH, mode=Mode.SUBTRACT)

    # Sketch77 → Boss-Extrude37 (add)
    with BuildSketch(Plane(origin=(0, -18, 0), x_dir=(1, 0, 0), z_dir=(0, 1, 0))):
        with BuildLine():
            Line((1.462533805, -921.55041641), (-0.557648707, -919.406501824))
            Line((-0.557648707, -919.406501824), (-2.281492719, -924.363953307))
            Line((-2.281492719, -924.363953307), (-6.699400727, -937.069026653))
            Line((-6.699400727, -937.069026653), (11.67040627, -948.187810964))
            Line((11.67040627, -948.187810964), (16.81454968, -933.394221056))
            Line((16.81454968, -933.394221056), (19.299071834, -926.249202161))
            Line((19.299071834, -926.249202161), (16.634671795, -928.100585311))
            ThreePointArc((16.634671795, -928.100585311), (4.06740687, -936.363431126), (1.462533805, -921.55041641))
        make_face()
    extrude(amount=-BOSS_EXTRUDE37_DEPTH)

    # Sketch78 → Boss-Extrude40 (add)
    with BuildSketch(Plane(origin=(0, -18, 0), x_dir=(1, 0, 0), z_dir=(0, 1, 0))):
        with BuildLine():
            Line((-39.266128585, -978.146354464), (-39.266128585, -988.183184315))
            ThreePointArc((-39.266128585, -988.183184315), (-31.766128585, -980.683184315), (-24.266128585, -988.183184315))
            Line((-24.266128585, -988.183184315), (-24.266128585, -978.146354464))
            Line((-24.266128585, -978.146354464), (-39.266128585, -978.146354464))
        make_face()
    extrude(amount=-BOSS_EXTRUDE40_DEPTH)

    # Sketch79 → Cut-Extrude30 (cut)
    with BuildSketch(Plane(origin=(0, -18, 0), x_dir=(1, 0, 0), z_dir=(0, 1, 0))):
        with Locations((-29.982661302, -973.386354464)):
            Rectangle(SKETCH79_W, SKETCH79_H)
        with Locations((-33.982661302, -973.386354464)):
            Rectangle(SKETCH79_W, SKETCH79_H)
    extrude(amount=-CUT_EXTRUDE30_DEPTH, mode=Mode.SUBTRACT)

    # Sketch85 → Cut-Extrude31 (cut)
    with BuildSketch(Plane(origin=(0, -18, 0), x_dir=(1, 0, 0), z_dir=(0, 1, 0))):
        Polygon((-5.461858654, -962.859459909), (-4.428526542, -960.066178119), (-8.334299408, -958.621296855), (-9.36763152, -961.414578645), align=None)
        Polygon((-0.83135104, -961.396898482), (-4.428526542, -960.066178119), (-5.461858654, -962.859459909), (-1.864683152, -964.190180273), align=None)
    extrude(amount=-CUT_EXTRUDE31_DEPTH, mode=Mode.SUBTRACT)

    # Sketch82 → Cut-Extrude32 (cut)
    with BuildSketch(Plane(origin=(0, -18, 0), x_dir=(1, 0, 0), z_dir=(0, 1, 0))):
        Polygon((5.559542696, -944.376350609), (4.58381617, -947.230053718), (-2.980774937, -944.626793955), (-2.010193078, -941.788137432), align=None)
    extrude(amount=-CUT_EXTRUDE32_DEPTH, mode=Mode.SUBTRACT)


solid = body_2_4.part
